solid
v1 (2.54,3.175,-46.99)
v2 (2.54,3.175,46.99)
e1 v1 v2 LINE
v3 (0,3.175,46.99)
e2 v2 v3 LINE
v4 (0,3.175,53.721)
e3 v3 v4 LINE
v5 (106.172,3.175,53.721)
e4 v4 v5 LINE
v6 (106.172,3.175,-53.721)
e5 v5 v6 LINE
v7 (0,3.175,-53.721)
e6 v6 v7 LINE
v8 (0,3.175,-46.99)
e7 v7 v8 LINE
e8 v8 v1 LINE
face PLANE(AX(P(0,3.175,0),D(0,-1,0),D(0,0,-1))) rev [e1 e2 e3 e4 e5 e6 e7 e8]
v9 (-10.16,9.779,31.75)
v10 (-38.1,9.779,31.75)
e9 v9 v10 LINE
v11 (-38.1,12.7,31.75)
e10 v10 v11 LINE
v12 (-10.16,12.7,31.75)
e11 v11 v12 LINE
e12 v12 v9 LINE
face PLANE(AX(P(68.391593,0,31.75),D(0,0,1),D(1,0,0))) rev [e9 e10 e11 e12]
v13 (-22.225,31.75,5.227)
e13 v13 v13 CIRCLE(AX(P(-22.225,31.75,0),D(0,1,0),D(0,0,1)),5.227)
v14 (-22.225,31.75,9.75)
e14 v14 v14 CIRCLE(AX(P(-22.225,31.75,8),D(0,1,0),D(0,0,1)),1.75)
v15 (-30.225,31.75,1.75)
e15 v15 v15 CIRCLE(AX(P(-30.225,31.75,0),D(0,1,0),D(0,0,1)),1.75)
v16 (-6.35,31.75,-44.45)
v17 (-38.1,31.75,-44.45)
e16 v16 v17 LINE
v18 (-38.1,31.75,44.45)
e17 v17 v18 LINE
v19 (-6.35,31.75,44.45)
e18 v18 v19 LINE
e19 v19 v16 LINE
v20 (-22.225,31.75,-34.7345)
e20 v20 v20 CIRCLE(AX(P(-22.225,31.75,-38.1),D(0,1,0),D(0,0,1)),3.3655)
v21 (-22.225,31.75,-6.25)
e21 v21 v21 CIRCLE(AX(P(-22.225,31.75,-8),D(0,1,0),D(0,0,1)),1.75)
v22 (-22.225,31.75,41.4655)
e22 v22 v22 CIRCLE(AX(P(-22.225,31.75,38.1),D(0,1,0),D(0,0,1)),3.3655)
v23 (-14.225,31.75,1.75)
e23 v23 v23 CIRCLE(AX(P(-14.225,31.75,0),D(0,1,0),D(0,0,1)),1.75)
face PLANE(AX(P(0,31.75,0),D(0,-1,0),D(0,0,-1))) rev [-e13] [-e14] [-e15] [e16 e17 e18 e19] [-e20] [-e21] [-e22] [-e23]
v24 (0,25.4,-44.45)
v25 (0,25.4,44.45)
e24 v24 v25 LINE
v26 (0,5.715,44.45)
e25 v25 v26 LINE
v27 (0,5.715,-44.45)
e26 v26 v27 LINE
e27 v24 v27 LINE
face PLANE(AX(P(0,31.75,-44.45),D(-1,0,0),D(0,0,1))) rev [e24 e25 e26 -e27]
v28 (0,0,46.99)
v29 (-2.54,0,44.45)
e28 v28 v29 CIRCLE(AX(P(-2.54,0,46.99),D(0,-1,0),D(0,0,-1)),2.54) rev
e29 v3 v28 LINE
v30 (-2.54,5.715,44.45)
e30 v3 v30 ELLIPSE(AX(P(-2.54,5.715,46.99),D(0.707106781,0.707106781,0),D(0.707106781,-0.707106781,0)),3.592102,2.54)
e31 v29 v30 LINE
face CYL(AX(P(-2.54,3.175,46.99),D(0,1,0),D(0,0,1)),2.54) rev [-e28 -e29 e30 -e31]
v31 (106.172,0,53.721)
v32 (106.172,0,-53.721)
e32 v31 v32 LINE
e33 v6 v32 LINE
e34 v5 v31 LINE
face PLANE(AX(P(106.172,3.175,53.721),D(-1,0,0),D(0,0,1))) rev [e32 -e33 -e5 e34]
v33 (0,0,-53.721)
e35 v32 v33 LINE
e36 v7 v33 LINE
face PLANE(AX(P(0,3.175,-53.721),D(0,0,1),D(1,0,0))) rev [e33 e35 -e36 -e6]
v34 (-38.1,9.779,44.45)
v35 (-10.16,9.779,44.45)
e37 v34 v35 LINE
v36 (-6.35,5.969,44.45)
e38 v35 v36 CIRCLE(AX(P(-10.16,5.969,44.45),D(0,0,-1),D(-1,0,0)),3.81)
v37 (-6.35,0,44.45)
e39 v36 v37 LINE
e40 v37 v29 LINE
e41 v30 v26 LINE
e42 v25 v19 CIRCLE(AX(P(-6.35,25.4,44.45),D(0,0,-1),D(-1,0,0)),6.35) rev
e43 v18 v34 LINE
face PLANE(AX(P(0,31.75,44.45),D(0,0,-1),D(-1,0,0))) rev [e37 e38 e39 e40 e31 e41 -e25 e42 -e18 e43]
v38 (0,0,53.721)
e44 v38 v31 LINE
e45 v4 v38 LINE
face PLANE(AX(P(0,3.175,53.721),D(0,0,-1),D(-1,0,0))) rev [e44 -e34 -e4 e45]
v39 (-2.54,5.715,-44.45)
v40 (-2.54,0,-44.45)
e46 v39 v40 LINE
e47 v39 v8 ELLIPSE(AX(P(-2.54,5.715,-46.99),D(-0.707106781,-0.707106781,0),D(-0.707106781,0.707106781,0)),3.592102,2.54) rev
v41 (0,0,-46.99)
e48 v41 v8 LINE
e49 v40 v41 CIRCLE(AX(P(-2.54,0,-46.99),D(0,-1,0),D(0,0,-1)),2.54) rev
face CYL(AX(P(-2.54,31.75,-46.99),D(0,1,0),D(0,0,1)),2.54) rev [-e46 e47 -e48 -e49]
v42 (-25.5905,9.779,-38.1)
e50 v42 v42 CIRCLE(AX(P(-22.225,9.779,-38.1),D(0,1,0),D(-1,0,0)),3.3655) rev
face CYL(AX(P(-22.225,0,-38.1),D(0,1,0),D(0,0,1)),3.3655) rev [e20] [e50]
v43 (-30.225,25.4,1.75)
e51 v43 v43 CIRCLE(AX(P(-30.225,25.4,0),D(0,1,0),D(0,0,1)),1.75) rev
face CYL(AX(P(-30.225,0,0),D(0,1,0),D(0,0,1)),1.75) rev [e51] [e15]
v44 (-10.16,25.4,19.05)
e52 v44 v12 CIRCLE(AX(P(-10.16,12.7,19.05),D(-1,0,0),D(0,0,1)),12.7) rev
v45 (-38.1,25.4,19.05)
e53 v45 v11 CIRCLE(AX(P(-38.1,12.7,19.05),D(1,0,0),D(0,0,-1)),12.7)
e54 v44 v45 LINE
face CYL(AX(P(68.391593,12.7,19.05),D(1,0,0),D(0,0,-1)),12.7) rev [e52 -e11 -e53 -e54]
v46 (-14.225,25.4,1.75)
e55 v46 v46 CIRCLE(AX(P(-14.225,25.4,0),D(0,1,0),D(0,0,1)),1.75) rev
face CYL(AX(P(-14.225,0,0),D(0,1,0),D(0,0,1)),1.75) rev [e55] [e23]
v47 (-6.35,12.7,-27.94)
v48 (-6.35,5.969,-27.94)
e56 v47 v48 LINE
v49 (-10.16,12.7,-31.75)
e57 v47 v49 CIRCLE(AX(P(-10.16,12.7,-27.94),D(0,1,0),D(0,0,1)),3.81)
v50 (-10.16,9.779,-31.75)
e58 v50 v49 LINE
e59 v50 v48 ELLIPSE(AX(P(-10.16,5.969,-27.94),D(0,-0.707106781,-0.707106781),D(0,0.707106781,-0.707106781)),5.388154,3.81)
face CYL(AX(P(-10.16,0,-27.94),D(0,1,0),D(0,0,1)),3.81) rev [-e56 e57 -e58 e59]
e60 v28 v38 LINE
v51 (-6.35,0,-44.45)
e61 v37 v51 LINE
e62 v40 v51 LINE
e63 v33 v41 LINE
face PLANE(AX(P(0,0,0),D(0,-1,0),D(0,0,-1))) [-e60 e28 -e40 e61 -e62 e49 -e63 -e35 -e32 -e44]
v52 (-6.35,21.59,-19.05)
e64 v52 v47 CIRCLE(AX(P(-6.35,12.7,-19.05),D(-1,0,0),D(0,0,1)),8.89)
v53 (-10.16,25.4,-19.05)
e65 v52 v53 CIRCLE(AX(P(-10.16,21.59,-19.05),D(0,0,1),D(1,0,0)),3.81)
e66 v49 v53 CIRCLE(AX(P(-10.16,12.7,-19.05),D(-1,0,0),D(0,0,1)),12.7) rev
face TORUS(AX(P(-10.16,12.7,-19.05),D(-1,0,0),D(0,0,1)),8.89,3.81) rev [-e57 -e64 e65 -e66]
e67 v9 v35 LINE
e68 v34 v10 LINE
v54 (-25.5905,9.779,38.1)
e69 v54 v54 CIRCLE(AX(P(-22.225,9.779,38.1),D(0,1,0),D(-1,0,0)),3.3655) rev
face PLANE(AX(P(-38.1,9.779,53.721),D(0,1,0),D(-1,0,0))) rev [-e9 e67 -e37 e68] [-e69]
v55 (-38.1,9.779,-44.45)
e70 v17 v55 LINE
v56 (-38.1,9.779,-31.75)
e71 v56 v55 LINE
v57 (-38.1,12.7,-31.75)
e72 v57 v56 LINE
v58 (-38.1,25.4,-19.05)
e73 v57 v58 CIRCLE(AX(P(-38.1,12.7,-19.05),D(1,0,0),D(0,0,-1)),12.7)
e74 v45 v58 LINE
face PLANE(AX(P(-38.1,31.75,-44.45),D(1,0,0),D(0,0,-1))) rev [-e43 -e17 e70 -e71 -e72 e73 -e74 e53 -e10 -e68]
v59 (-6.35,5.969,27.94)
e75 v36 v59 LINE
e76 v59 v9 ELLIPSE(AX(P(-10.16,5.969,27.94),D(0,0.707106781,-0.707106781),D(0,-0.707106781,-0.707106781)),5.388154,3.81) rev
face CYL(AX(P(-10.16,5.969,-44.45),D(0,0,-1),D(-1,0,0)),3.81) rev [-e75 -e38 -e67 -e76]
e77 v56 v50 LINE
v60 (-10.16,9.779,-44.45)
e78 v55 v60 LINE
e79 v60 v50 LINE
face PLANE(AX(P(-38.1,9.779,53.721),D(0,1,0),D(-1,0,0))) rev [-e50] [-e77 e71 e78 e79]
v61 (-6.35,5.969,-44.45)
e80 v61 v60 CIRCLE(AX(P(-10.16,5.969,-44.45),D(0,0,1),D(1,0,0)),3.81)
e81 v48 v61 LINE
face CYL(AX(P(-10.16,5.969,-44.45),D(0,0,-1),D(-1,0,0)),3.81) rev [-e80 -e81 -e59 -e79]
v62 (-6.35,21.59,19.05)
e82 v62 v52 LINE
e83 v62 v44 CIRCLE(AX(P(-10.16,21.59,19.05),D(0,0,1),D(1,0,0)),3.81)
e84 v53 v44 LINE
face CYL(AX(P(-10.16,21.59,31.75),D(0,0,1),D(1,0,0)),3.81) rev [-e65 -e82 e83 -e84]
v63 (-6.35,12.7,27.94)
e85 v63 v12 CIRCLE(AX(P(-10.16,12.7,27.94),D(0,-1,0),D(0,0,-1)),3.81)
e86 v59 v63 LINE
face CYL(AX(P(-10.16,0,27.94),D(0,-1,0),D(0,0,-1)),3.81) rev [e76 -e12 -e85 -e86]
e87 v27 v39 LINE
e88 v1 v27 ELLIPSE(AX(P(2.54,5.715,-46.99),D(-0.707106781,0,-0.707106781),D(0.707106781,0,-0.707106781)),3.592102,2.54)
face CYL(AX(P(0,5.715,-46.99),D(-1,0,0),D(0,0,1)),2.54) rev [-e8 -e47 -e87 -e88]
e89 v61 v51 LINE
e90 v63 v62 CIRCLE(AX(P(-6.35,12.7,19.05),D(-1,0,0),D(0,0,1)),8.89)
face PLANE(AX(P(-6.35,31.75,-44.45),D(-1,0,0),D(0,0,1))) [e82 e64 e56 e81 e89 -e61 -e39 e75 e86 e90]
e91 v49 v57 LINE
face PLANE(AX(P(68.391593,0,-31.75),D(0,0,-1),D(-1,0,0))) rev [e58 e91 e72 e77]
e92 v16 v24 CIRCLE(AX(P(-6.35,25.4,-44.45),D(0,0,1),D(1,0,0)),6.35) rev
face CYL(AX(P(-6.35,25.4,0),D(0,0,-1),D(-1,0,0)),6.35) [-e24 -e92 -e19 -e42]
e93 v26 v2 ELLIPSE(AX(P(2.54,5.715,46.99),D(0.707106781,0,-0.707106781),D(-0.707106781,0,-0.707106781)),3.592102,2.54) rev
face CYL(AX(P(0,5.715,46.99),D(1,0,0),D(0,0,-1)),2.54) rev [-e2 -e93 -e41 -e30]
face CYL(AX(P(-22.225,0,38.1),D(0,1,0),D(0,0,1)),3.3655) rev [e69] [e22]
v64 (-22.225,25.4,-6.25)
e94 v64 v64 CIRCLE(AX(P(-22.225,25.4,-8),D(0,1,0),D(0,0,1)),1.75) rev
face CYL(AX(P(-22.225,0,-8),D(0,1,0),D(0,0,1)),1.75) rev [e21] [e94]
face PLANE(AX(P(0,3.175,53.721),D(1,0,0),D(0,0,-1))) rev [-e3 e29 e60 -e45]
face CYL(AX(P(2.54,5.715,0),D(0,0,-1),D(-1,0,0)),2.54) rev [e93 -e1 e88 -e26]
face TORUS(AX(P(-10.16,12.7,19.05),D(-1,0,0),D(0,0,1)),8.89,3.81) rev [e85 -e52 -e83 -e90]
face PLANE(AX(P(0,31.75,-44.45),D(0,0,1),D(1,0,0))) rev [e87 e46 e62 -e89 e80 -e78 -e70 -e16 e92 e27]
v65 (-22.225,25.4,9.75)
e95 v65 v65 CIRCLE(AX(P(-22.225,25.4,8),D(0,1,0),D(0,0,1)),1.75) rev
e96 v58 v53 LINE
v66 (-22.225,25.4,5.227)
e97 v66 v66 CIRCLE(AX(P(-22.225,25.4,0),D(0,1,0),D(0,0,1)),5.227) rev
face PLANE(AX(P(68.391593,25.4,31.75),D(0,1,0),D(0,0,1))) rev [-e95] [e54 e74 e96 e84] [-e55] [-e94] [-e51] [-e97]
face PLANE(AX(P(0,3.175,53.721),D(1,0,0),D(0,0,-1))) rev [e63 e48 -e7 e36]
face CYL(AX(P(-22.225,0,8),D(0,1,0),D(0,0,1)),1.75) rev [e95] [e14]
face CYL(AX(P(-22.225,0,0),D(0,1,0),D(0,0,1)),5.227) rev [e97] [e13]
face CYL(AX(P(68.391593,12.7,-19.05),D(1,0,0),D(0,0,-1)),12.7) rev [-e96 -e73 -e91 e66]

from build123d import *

# Parameters (mm, degrees)
SKETCH1_W           = 106.172
SKETCH1_H           = 107.442
BOSS_EXTRUDE1_DEPTH = 3.175
SKETCH13_W          = 38.1
SKETCH13_H          = 88.9
BOSS_EXTRUDE7_DEPTH = 31.75
SKETCH15_R          = 3.3655
SKETCH15_R_2        = 5.22699996
SKETCH15_R_3        = 1.750000056
CUT_EXTRUDE1_DEPTH  = 124.152352495
SKETCH17_W          = 63.5
SKETCH17_H          = 25.4
CUT_EXTRUDE2_DEPTH  = 31.75
SKETCH18_W          = 31.75
SKETCH18_H          = 9.779
CUT_EXTRUDE3_DEPTH  = 149.047631947
FILLET2_R           = 12.7
FILLET1_R           = 3.81
FILLET3_R           = 2.54
FILLET4_R           = 2.54
FILLET5_R           = 6.35


with BuildPart() as part:
    # Sketch1 → Boss-Extrude1 (new body)
    with BuildSketch(Plane(origin=(0, 0, 0), x_dir=(1, 0, 0), z_dir=(0, 1, 0))):
        with Locations((53.086, 0)):
            Rectangle(SKETCH1_W, SKETCH1_H)
    extrude(amount=BOSS_EXTRUDE1_DEPTH)

    # Sketch13 → Boss-Extrude7 (add)
    with BuildSketch(Plane(origin=(0, 0, 0), x_dir=(1, 0, 0), z_dir=(0, 1, 0))):
        with Locations((-19.05, 0)):
            Rectangle(SKETCH13_W, SKETCH13_H)
    extrude(amount=BOSS_EXTRUDE7_DEPTH)

    # Sketch15 → Cut-Extrude1 (cut, through all)
    with BuildSketch(Plane(origin=(0, 31.75, 0), x_dir=(1, 0, 0), z_dir=(0, 1, 0))):
        with Locations(Location((-22.225, 38.1, 0), (0, 0, 270))):
            Circle(SKETCH15_R)
        with Locations(Location((-22.225, -38.1, 0), (0, 0, 270))):
            Circle(SKETCH15_R)
        with Locations(Location((-22.225, 0, 0), (0, 0, 270))):
            Circle(SKETCH15_R_2)
        with Locations(Location((-14.224999998, 0, 0), (0, 0, 270))):
            Circle(SKETCH15_R_3)
        with Locations(Location((-22.225, -8.000000002, 0), (0, 0, 270))):
            Circle(SKETCH15_R_3)
        with Locations(Location((-30.225000002, 0, 0), (0, 0, 270))):
            Circle(SKETCH15_R_3)
        with Locations(Location((-22.225, 8.000000002, 0), (0, 0, 270))):
            Circle(SKETCH15_R_3)
    extrude(amount=-CUT_EXTRUDE1_DEPTH, mode=Mode.SUBTRACT)

    # Sketch17 → Cut-Extrude2 (cut)
    with BuildSketch(Plane.ZY.offset(38.1)):
        with Locations((0, 12.7)):
            Rectangle(SKETCH17_W, SKETCH17_H)
    extrude(amount=-CUT_EXTRUDE2_DEPTH, mode=Mode.SUBTRACT)

    # Sketch18 → Cut-Extrude3 (cut, through all)
    with BuildSketch(Plane(origin=(0, 0, -44.45), x_dir=(-1, 0, 0), z_dir=(0, 0, -1))):
        with Locations((22.225, 4.8895)):
            Rectangle(SKETCH18_W, SKETCH18_H)
    extrude(amount=-CUT_EXTRUDE3_DEPTH, mode=Mode.SUBTRACT)

    # Fillet2
    fillet2_edges = [part.edges().sort_by_distance(p)[0] for p in [
        (-22.225, 25.4, -31.75),
        (-22.225, 25.4, 31.75),
    ]]
    fillet(fillet2_edges, radius=FILLET2_R)

    # Fillet1
    fillet1_edges = [part.edges().sort_by_distance(p)[0] for p in [
        (-6.35, 9.779, 38.1),
        (-6.35, 9.779, -38.1),
        (-6.35, 25.4, 0),
        (-6.35, 11.2395, 31.75),
        (-6.35, 21.680256121, -28.030256121),
        (-6.35, 21.680256121, 28.030256121),
        (-6.35, 11.2395, -31.75),
    ]]
    fillet(fillet1_edges, radius=FILLET1_R)

    # Fillet3
    fillet3_edges = [part.edges().sort_by_distance(p)[0] for p in [
        (0, 3.175, 0),
    ]]
    fillet(fillet3_edges, radius=FILLET3_R)

    # Fillet4
    fillet4_edges = [part.edges().sort_by_distance(p)[0] for p in [
        (1.27, 3.175, 44.45),
        (1.27, 3.175, -44.45),
        (0, 1.5875, 44.45),
        (0, 1.5875, -44.45),
    ]]
    fillet(fillet4_edges, radius=FILLET4_R - 0.0001)  # a hair under: the kernel refuses the full size

    # Fillet5
    fillet5_edges = [part.edges().sort_by_distance(p)[0] for p in [
        (0, 31.75, 0),
    ]]
    fillet(fillet5_edges, radius=FILLET5_R)


solid = part.part
